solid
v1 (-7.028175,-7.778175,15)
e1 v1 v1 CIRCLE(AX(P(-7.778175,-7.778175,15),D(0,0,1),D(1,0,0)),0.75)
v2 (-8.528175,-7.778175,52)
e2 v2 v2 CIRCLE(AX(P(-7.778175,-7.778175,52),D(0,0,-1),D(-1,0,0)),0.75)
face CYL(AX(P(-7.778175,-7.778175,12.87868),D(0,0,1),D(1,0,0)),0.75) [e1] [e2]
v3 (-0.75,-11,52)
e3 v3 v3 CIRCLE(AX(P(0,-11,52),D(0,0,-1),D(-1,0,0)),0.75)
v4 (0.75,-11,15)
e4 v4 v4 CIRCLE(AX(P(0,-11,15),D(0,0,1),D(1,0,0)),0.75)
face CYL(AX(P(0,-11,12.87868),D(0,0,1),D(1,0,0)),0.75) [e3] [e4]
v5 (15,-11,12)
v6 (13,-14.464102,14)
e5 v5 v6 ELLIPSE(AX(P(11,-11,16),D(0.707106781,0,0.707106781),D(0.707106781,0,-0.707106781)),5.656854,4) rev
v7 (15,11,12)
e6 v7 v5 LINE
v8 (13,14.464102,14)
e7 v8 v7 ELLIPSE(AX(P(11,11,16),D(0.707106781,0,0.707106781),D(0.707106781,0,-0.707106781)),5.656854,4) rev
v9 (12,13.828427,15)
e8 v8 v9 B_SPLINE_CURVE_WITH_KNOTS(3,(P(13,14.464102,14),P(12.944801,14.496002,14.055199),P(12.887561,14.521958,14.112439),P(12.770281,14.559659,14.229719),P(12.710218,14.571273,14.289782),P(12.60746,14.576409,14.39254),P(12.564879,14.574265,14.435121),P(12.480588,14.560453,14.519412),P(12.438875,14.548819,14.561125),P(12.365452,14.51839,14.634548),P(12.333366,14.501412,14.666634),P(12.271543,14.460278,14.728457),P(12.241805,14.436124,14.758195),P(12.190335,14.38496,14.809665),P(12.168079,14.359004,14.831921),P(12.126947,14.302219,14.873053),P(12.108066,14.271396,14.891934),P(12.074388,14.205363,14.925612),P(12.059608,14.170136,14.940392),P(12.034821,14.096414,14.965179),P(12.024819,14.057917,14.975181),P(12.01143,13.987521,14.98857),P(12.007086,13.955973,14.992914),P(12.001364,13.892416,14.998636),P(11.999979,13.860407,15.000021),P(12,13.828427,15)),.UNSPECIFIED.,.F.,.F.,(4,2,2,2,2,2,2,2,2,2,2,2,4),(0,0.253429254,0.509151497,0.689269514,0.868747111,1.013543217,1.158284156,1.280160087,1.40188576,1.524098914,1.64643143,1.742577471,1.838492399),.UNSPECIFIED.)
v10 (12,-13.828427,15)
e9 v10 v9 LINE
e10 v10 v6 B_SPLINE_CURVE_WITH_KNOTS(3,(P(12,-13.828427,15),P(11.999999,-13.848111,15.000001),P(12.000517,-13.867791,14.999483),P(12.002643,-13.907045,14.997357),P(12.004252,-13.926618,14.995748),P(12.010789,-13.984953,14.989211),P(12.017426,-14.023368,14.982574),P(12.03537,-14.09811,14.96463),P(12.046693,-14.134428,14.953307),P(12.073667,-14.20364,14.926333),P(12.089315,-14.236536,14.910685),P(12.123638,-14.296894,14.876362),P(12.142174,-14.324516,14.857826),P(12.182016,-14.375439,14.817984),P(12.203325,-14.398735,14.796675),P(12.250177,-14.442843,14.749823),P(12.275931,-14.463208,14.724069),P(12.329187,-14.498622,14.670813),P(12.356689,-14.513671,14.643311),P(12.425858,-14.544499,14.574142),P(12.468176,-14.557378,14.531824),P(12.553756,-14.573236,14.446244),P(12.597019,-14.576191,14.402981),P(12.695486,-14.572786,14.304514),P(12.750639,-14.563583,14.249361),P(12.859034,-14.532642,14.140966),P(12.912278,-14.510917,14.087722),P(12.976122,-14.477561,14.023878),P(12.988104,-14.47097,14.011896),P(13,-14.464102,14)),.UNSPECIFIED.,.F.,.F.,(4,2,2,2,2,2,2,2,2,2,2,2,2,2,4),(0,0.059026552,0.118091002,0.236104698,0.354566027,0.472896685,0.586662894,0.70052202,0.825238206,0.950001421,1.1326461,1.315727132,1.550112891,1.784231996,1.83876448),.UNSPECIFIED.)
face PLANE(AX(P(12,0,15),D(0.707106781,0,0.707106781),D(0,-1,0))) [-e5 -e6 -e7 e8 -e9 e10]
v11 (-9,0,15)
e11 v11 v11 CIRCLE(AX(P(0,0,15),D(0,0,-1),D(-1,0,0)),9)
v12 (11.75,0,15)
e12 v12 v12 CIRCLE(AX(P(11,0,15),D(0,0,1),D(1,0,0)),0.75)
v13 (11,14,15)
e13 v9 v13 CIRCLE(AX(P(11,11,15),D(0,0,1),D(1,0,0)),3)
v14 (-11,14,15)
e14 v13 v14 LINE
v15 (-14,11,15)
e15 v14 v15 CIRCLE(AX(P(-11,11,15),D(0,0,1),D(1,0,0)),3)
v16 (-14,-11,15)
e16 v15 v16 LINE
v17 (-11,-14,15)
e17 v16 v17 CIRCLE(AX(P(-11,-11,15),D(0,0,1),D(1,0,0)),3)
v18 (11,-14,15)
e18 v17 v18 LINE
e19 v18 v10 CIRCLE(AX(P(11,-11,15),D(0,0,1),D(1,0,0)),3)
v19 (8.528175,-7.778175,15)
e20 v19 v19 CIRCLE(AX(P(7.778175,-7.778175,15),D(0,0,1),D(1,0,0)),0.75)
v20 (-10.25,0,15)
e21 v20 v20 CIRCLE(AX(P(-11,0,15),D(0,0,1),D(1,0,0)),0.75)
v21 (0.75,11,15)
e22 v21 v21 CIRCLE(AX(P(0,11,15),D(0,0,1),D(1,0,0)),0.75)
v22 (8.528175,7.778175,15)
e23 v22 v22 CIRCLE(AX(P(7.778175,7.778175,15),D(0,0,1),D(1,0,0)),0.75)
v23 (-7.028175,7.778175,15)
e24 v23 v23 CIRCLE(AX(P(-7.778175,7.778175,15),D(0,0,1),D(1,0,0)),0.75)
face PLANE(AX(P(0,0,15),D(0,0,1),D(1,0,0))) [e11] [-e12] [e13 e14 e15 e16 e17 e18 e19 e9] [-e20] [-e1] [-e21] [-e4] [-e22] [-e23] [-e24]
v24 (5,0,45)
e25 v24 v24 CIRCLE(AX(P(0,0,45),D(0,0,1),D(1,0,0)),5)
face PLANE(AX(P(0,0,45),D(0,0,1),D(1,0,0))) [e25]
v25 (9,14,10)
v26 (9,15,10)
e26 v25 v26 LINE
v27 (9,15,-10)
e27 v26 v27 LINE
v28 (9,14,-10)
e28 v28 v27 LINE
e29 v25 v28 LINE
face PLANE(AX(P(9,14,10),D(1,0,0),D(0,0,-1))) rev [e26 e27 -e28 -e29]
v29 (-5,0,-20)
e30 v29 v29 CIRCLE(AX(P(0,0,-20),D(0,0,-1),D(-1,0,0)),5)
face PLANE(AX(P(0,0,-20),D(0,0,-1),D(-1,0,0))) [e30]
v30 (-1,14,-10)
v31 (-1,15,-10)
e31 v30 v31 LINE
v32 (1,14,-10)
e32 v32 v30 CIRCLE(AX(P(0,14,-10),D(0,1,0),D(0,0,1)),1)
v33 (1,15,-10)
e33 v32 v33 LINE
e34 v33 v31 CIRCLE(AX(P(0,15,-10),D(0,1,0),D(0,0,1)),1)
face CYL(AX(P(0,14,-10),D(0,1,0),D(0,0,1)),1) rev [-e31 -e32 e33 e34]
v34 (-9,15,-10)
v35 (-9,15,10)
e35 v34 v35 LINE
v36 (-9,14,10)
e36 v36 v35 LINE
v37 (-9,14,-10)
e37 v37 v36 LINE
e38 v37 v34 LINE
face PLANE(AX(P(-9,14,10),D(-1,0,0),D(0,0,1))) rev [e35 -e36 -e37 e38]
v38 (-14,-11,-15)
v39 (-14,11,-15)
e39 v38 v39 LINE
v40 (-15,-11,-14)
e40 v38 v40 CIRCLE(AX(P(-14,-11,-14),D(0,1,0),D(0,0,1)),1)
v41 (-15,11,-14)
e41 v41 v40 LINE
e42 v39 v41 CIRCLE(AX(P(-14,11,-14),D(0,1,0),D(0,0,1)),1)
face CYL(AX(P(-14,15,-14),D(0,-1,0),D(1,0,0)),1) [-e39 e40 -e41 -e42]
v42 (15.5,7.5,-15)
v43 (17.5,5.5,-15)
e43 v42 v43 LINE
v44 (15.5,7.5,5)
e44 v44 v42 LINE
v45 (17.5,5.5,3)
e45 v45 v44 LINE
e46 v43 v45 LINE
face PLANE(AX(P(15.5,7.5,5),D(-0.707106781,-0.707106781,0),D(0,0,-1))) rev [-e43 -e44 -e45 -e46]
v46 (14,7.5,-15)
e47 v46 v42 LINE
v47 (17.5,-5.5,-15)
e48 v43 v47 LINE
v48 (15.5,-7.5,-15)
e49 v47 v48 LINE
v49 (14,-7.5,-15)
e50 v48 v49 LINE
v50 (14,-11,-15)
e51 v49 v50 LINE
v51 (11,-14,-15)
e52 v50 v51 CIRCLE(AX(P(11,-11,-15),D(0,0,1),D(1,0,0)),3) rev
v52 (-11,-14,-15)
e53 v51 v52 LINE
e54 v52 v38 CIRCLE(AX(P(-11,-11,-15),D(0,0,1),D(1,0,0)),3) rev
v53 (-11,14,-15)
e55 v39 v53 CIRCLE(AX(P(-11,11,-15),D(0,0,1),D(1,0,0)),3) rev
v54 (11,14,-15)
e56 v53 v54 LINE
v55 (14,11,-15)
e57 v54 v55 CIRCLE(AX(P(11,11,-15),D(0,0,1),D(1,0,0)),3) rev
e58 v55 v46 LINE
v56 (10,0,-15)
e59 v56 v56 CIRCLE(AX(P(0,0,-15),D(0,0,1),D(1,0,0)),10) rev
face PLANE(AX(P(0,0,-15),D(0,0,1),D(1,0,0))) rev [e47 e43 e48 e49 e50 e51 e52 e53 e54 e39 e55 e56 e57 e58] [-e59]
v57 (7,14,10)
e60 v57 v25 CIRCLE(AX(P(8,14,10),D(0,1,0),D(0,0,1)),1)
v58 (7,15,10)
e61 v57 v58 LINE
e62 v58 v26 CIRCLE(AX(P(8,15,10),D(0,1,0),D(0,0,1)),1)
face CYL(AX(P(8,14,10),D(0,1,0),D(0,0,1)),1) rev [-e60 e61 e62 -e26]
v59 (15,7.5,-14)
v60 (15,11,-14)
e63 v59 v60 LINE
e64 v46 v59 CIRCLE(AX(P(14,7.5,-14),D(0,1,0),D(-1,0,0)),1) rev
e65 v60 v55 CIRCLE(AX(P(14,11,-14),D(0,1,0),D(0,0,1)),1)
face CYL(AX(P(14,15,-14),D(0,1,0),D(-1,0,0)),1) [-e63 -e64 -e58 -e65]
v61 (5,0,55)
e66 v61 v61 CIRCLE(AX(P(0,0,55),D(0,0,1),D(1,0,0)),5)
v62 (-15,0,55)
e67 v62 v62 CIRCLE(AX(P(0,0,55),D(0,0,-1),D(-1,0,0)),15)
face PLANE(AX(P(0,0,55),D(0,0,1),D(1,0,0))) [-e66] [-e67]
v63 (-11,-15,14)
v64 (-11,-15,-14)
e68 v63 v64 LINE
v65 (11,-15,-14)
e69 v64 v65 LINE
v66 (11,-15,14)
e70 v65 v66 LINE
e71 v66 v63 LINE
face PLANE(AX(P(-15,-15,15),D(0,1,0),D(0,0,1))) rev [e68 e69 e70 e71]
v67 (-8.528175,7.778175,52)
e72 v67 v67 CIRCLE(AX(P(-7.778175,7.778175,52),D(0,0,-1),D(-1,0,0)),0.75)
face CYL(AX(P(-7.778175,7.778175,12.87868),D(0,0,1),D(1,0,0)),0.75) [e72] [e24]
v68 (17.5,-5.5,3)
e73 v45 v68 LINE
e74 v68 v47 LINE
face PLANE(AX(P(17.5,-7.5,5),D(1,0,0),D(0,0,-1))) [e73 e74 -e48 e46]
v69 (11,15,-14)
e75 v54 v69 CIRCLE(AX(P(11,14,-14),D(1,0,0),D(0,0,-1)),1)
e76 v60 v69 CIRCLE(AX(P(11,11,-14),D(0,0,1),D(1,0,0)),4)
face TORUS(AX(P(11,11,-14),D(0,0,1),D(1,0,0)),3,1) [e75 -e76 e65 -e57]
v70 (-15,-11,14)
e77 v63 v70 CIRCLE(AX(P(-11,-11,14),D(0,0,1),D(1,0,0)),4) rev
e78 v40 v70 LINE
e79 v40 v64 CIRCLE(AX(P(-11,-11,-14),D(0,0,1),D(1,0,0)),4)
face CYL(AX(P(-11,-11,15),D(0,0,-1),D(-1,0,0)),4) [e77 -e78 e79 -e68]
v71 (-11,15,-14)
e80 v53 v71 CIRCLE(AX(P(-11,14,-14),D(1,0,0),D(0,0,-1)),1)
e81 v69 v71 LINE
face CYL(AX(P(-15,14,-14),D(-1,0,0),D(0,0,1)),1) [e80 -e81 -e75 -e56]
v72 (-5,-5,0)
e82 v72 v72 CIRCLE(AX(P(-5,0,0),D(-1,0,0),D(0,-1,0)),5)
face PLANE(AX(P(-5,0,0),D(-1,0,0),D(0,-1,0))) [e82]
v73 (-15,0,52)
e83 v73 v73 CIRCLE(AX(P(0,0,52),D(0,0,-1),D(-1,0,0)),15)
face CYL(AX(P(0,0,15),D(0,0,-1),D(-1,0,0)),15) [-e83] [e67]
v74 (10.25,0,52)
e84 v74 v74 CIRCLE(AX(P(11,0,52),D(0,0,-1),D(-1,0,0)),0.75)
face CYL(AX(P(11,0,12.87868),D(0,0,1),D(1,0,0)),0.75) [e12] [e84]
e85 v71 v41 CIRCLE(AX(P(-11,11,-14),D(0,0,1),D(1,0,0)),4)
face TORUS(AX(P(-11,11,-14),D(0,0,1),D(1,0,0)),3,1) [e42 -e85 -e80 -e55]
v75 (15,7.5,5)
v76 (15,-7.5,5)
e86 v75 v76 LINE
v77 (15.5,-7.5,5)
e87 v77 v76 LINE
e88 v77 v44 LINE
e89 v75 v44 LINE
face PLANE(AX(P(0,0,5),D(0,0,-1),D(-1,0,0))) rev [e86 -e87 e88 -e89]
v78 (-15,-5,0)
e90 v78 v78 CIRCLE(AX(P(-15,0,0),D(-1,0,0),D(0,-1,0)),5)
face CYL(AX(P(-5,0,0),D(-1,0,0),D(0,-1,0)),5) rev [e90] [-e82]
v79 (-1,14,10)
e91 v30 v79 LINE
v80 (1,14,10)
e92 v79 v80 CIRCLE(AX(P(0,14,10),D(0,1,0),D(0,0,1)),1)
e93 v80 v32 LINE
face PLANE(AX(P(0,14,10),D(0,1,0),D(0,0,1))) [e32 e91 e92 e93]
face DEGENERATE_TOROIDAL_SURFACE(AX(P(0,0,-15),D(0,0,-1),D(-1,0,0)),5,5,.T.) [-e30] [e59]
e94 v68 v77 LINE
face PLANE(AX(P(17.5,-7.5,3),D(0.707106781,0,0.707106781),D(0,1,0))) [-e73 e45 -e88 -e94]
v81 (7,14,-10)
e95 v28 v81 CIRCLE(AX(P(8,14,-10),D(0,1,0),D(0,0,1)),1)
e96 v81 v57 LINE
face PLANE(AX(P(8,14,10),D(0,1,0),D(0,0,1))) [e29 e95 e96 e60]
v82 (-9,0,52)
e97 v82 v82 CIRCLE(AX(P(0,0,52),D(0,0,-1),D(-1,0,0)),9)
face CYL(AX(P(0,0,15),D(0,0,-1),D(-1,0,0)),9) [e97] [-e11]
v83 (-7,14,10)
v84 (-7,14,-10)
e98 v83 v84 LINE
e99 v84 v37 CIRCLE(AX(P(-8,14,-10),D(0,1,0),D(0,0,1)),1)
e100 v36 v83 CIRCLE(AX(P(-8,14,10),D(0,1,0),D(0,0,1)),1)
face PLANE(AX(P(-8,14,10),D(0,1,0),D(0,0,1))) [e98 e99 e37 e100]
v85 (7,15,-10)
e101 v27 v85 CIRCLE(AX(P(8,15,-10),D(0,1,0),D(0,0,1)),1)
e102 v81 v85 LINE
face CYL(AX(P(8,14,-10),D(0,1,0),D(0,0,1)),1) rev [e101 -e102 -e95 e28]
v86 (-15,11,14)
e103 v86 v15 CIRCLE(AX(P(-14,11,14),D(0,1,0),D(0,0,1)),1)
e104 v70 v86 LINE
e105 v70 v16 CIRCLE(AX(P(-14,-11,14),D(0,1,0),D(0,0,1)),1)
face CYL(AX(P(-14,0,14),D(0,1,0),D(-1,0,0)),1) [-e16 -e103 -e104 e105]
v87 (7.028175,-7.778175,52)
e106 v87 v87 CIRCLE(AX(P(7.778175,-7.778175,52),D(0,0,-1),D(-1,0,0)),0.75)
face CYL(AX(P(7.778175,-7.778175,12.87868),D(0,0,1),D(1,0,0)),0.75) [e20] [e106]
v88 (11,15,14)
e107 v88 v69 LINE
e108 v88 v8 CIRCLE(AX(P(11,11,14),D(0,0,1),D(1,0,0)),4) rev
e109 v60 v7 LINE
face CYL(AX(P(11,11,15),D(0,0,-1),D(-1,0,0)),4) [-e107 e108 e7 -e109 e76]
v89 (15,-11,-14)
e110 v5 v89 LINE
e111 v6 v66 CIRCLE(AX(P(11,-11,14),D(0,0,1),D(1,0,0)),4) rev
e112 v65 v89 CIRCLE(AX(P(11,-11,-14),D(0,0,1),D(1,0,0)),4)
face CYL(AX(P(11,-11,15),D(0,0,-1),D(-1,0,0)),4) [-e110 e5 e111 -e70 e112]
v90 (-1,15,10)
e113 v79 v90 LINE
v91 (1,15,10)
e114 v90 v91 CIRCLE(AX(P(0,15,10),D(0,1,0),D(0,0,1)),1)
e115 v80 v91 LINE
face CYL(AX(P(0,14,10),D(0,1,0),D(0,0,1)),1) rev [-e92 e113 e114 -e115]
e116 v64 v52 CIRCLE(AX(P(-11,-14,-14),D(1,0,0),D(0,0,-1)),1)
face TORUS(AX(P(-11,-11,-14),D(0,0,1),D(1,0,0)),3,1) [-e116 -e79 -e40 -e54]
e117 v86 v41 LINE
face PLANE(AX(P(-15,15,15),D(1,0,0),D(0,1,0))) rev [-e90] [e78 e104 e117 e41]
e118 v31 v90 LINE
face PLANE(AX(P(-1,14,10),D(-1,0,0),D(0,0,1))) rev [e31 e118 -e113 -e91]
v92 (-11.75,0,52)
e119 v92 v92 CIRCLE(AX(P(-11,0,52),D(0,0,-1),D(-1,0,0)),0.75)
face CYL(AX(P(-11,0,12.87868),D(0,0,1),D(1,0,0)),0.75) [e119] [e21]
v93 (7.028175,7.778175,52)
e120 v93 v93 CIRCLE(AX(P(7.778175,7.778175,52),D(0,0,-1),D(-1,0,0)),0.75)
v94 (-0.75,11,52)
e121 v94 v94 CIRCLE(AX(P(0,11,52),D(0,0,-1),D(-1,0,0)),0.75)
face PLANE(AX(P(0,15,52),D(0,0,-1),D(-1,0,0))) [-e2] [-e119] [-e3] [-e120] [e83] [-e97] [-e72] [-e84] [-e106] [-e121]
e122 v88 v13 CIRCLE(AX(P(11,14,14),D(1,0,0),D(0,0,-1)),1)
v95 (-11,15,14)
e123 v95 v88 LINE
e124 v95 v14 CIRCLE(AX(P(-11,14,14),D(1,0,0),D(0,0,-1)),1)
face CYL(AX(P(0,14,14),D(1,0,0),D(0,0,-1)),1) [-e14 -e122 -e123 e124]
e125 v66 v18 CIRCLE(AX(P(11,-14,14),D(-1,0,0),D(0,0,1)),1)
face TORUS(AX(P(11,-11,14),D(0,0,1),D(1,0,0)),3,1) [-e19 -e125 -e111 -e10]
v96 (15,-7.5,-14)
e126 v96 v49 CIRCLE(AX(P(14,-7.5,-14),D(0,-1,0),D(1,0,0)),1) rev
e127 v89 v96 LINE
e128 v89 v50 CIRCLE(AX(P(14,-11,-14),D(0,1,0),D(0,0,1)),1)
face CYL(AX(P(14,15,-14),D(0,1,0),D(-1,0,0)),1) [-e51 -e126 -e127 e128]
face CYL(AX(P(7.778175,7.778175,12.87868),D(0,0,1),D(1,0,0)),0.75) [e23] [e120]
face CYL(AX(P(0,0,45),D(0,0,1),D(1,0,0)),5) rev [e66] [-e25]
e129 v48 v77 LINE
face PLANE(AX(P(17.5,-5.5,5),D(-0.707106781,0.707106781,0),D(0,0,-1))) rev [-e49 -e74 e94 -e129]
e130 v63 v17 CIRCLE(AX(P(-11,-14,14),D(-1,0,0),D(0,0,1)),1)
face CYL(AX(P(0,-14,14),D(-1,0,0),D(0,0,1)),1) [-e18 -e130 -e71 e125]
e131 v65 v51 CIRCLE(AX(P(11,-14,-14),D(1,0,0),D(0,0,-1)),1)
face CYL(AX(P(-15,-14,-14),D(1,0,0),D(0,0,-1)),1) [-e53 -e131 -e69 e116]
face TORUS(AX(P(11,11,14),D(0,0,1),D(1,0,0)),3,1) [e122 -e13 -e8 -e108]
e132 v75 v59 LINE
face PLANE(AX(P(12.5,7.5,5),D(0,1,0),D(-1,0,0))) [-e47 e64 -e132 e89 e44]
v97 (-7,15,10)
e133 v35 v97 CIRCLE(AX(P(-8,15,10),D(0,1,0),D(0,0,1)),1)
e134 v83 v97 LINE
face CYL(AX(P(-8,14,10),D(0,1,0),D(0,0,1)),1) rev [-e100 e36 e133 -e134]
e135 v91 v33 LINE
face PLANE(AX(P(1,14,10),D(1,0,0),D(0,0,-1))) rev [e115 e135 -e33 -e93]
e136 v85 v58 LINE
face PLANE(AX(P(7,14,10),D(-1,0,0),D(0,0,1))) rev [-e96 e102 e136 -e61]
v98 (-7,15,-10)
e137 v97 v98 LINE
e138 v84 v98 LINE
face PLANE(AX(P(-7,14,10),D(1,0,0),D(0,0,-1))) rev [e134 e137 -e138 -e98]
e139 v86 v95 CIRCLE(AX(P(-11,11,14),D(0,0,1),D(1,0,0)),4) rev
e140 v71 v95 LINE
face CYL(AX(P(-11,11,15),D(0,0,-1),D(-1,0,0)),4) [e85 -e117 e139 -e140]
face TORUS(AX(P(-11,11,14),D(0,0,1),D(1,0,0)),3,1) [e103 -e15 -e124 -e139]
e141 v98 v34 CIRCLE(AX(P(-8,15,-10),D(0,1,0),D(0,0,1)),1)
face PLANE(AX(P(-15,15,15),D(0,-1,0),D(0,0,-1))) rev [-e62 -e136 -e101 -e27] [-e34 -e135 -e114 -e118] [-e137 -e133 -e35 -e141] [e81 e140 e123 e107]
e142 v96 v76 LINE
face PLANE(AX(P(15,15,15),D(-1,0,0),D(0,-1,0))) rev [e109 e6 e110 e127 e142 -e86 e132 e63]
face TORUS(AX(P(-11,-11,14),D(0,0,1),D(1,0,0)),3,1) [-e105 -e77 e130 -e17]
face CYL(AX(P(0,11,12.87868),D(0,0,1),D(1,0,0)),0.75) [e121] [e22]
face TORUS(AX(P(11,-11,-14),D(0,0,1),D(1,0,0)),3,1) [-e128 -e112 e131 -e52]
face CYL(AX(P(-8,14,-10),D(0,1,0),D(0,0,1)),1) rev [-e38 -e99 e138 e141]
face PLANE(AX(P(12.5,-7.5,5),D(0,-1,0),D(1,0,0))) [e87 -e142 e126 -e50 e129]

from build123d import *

# Parameters (mm, degrees)
SKETCH1_W           = 30
SKETCH1_H           = 30
BOSS_EXTRUDE1_DEPTH = 15
FILLET1_R           = 4
CHAMFER2_SIZE       = 3
FILLET2_R           = 1
SKETCH3_R           = 10
BOSS_EXTRUDE2_DEPTH = 5
FILLET3_R           = 5
SKETCH4_W           = 5
SKETCH4_H           = 15
BOSS_EXTRUDE3_DEPTH = 20
CHAMFER3_SIZE       = 2
SKETCH5_R           = 5
CUT_EXTRUDE1_DEPTH  = 10
SKETCH6_R           = 0.75
BOSS_EXTRUDE5_DEPTH = 40
CIRPATTERN2_COUNT   = 8
SKETCH7_R           = 5
CUT_EXTRUDE2_DEPTH  = 10
CUT_EXTRUDE3_DEPTH  = 1
LPATTERN1_COUNT     = 2
LPATTERN1_PITCH     = 8
LPATTERN1_COL_COUNT = 2
LPATTERN1_COL_PITCH = 8


# Some blends are built 0.0001 mm under size
with BuildPart() as part:
    # Sketch1 → Boss-Extrude1 (new, symmetric)
    with BuildSketch(Plane.XY):
        Rectangle(SKETCH1_W, SKETCH1_H)
    extrude(amount=BOSS_EXTRUDE1_DEPTH, both=True)

    # Sketch2 → Revolve1 (revolve)
    with BuildSketch(Plane(origin=(0, 0, 0), x_dir=(0, 0, -1), z_dir=(1, 0, 0)), mode=Mode.PRIVATE) as revolve1_sk:
        Polygon((-55, 0), (-55, 15), (-52, 15), (-52, 9), (-15, 9), (-15, 0), align=None)
    revolve(revolve1_sk.sketch.rotate(Axis((0, 0, 15), (0, 0, 1)), 90), axis=Axis((0, 0, 15), (0, 0, 1)))

    # Fillet1
    fillet1_edges = [part.edges().sort_by_distance(p)[0] for p in [
        (15, -15, 0),
        (-15, -15, 0),
        (-15, 15, 0),
        (15, 15, 0),
    ]]
    fillet(fillet1_edges, radius=FILLET1_R)

    # Chamfer2
    # the kernel refuses this chamfer: 3 mm, written as the material it takes off along each edge
    with BuildSketch(Plane(origin=(15, 18.715048964, 15), x_dir=(-0.9996219169112969, 0, 0.02749587661058621), z_dir=(0, -1, 0))) as chamfer2_piece_1:
        Polygon((CHAMFER2_SIZE * 0.999621916911, CHAMFER2_SIZE * 0.0274958766106), (-CHAMFER2_SIZE * 0.0274958766106, CHAMFER2_SIZE * 0.999621916911), (0, 0), align=None)
    extrude(amount=37.430097928, mode=Mode.SUBTRACT)

    # Fillet2
    fillet2_edges = [part.edges().sort_by_distance(p)[0] for p in [
        (13.828427125, 13.828427125, -15),
        (15, 0, -15),
        (13.828427125, -13.828427125, -15),
        (0, -15, -15),
        (-13.828427125, -13.828427125, -15),
        (-15, 0, -15),
        (-13.828427125, 13.828427125, -15),
        (11.50401717, 14.968118785, 15),
        (11.50401717, -14.968118785, 15),
        (0, -15, 15),
        (-13.828427125, -13.828427125, 15),
        (-15, 0, 15),
        (-13.828427125, 13.828427125, 15),
        (0, 15, -15),
        (0, 15, 15),
    ]]
    fillet(fillet2_edges, radius=FILLET2_R)

    # Sketch3 → Boss-Extrude2 (add)
    with BuildSketch(Plane(origin=(0, 0, -15), x_dir=(-1, 0, 0), z_dir=(0, 0, -1))):
        with Locations(Location((0, 0, 0), (0, 0, 180))):
            Circle(SKETCH3_R)
    extrude(amount=BOSS_EXTRUDE2_DEPTH)

    # Fillet3
    fillet3_edges = [part.edges().sort_by_distance(p)[0] for p in [
        (-10, 0, -20),
    ]]
    fillet(fillet3_edges, radius=FILLET3_R - 0.0001)  # a hair under: the kernel refuses the full size

    # Sketch4 → Boss-Extrude3 (add)
    with BuildSketch(Plane(origin=(0, 0, -15), x_dir=(-1, 0, 0), z_dir=(0, 0, -1))):
        with Locations((-15, 0)):
            Rectangle(SKETCH4_W, SKETCH4_H)
    extrude(amount=-BOSS_EXTRUDE3_DEPTH)

    # Chamfer3
    chamfer3_edges = [part.edges().sort_by_distance(p)[0] for p in [
        (17.5, 7.5, -5),
        (17.5, 0, 5),
        (17.5, -7.5, -5),
    ]]
    chamfer(chamfer3_edges, length=CHAMFER3_SIZE)

    # Sketch5 → Cut-Extrude1 (cut)
    with BuildSketch(Plane.XY.offset(55)):
        Circle(SKETCH5_R)
    extrude(amount=-CUT_EXTRUDE1_DEPTH, mode=Mode.SUBTRACT)

    # Sketch6 → Boss-Extrude5 (add)
    with BuildSketch(Plane.XY.offset(55)):
        with Locations((0, 11)):
            Circle(SKETCH6_R)
    boss_extrude5 = extrude(amount=-BOSS_EXTRUDE5_DEPTH)

    # CirPattern2: Boss-Extrude5 ×8 about axis
    cirpattern2_axis = Axis((0, 0, 0), (0, 0, 1))
    for i in range(1, CIRPATTERN2_COUNT):
        add(boss_extrude5.rotate(cirpattern2_axis, i * 360 / CIRPATTERN2_COUNT))

    # Sketch7 → Cut-Extrude2 (cut)
    with BuildSketch(Plane.ZY.offset(15)):
        with Locations(Location((0, 0, 0), (0, 0, 270))):
            Circle(SKETCH7_R)
    extrude(amount=-CUT_EXTRUDE2_DEPTH, mode=Mode.SUBTRACT)

    # Sketch8 → Cut-Extrude3 (cut)
    with BuildSketch(Plane(origin=(0, 15, 0), x_dir=(1, 0, 0), z_dir=(0, 1, 0))):
        with BuildLine():
            Line((-1, -10), (-1, 10))
            ThreePointArc((-1, 10), (0, 11), (1, 10))
            Line((1, 10), (1, -10))
            ThreePointArc((1, -10), (0, -11), (-1, -10))
        make_face()
    cut_extrude3 = extrude(amount=-CUT_EXTRUDE3_DEPTH, mode=Mode.SUBTRACT)

    # LPattern1: Cut-Extrude3 ×2
    with Locations(*[(-i * LPATTERN1_PITCH, 0, 0) for i in range(1, LPATTERN1_COUNT)]):
        add(cut_extrude3, mode=Mode.SUBTRACT)

    # LPattern1 col: Cut-Extrude3 ×2
    with Locations(*[(i * LPATTERN1_COL_PITCH, 0, 0) for i in range(1, LPATTERN1_COL_COUNT)]):
        add(cut_extrude3, mode=Mode.SUBTRACT)


solid = part.part
